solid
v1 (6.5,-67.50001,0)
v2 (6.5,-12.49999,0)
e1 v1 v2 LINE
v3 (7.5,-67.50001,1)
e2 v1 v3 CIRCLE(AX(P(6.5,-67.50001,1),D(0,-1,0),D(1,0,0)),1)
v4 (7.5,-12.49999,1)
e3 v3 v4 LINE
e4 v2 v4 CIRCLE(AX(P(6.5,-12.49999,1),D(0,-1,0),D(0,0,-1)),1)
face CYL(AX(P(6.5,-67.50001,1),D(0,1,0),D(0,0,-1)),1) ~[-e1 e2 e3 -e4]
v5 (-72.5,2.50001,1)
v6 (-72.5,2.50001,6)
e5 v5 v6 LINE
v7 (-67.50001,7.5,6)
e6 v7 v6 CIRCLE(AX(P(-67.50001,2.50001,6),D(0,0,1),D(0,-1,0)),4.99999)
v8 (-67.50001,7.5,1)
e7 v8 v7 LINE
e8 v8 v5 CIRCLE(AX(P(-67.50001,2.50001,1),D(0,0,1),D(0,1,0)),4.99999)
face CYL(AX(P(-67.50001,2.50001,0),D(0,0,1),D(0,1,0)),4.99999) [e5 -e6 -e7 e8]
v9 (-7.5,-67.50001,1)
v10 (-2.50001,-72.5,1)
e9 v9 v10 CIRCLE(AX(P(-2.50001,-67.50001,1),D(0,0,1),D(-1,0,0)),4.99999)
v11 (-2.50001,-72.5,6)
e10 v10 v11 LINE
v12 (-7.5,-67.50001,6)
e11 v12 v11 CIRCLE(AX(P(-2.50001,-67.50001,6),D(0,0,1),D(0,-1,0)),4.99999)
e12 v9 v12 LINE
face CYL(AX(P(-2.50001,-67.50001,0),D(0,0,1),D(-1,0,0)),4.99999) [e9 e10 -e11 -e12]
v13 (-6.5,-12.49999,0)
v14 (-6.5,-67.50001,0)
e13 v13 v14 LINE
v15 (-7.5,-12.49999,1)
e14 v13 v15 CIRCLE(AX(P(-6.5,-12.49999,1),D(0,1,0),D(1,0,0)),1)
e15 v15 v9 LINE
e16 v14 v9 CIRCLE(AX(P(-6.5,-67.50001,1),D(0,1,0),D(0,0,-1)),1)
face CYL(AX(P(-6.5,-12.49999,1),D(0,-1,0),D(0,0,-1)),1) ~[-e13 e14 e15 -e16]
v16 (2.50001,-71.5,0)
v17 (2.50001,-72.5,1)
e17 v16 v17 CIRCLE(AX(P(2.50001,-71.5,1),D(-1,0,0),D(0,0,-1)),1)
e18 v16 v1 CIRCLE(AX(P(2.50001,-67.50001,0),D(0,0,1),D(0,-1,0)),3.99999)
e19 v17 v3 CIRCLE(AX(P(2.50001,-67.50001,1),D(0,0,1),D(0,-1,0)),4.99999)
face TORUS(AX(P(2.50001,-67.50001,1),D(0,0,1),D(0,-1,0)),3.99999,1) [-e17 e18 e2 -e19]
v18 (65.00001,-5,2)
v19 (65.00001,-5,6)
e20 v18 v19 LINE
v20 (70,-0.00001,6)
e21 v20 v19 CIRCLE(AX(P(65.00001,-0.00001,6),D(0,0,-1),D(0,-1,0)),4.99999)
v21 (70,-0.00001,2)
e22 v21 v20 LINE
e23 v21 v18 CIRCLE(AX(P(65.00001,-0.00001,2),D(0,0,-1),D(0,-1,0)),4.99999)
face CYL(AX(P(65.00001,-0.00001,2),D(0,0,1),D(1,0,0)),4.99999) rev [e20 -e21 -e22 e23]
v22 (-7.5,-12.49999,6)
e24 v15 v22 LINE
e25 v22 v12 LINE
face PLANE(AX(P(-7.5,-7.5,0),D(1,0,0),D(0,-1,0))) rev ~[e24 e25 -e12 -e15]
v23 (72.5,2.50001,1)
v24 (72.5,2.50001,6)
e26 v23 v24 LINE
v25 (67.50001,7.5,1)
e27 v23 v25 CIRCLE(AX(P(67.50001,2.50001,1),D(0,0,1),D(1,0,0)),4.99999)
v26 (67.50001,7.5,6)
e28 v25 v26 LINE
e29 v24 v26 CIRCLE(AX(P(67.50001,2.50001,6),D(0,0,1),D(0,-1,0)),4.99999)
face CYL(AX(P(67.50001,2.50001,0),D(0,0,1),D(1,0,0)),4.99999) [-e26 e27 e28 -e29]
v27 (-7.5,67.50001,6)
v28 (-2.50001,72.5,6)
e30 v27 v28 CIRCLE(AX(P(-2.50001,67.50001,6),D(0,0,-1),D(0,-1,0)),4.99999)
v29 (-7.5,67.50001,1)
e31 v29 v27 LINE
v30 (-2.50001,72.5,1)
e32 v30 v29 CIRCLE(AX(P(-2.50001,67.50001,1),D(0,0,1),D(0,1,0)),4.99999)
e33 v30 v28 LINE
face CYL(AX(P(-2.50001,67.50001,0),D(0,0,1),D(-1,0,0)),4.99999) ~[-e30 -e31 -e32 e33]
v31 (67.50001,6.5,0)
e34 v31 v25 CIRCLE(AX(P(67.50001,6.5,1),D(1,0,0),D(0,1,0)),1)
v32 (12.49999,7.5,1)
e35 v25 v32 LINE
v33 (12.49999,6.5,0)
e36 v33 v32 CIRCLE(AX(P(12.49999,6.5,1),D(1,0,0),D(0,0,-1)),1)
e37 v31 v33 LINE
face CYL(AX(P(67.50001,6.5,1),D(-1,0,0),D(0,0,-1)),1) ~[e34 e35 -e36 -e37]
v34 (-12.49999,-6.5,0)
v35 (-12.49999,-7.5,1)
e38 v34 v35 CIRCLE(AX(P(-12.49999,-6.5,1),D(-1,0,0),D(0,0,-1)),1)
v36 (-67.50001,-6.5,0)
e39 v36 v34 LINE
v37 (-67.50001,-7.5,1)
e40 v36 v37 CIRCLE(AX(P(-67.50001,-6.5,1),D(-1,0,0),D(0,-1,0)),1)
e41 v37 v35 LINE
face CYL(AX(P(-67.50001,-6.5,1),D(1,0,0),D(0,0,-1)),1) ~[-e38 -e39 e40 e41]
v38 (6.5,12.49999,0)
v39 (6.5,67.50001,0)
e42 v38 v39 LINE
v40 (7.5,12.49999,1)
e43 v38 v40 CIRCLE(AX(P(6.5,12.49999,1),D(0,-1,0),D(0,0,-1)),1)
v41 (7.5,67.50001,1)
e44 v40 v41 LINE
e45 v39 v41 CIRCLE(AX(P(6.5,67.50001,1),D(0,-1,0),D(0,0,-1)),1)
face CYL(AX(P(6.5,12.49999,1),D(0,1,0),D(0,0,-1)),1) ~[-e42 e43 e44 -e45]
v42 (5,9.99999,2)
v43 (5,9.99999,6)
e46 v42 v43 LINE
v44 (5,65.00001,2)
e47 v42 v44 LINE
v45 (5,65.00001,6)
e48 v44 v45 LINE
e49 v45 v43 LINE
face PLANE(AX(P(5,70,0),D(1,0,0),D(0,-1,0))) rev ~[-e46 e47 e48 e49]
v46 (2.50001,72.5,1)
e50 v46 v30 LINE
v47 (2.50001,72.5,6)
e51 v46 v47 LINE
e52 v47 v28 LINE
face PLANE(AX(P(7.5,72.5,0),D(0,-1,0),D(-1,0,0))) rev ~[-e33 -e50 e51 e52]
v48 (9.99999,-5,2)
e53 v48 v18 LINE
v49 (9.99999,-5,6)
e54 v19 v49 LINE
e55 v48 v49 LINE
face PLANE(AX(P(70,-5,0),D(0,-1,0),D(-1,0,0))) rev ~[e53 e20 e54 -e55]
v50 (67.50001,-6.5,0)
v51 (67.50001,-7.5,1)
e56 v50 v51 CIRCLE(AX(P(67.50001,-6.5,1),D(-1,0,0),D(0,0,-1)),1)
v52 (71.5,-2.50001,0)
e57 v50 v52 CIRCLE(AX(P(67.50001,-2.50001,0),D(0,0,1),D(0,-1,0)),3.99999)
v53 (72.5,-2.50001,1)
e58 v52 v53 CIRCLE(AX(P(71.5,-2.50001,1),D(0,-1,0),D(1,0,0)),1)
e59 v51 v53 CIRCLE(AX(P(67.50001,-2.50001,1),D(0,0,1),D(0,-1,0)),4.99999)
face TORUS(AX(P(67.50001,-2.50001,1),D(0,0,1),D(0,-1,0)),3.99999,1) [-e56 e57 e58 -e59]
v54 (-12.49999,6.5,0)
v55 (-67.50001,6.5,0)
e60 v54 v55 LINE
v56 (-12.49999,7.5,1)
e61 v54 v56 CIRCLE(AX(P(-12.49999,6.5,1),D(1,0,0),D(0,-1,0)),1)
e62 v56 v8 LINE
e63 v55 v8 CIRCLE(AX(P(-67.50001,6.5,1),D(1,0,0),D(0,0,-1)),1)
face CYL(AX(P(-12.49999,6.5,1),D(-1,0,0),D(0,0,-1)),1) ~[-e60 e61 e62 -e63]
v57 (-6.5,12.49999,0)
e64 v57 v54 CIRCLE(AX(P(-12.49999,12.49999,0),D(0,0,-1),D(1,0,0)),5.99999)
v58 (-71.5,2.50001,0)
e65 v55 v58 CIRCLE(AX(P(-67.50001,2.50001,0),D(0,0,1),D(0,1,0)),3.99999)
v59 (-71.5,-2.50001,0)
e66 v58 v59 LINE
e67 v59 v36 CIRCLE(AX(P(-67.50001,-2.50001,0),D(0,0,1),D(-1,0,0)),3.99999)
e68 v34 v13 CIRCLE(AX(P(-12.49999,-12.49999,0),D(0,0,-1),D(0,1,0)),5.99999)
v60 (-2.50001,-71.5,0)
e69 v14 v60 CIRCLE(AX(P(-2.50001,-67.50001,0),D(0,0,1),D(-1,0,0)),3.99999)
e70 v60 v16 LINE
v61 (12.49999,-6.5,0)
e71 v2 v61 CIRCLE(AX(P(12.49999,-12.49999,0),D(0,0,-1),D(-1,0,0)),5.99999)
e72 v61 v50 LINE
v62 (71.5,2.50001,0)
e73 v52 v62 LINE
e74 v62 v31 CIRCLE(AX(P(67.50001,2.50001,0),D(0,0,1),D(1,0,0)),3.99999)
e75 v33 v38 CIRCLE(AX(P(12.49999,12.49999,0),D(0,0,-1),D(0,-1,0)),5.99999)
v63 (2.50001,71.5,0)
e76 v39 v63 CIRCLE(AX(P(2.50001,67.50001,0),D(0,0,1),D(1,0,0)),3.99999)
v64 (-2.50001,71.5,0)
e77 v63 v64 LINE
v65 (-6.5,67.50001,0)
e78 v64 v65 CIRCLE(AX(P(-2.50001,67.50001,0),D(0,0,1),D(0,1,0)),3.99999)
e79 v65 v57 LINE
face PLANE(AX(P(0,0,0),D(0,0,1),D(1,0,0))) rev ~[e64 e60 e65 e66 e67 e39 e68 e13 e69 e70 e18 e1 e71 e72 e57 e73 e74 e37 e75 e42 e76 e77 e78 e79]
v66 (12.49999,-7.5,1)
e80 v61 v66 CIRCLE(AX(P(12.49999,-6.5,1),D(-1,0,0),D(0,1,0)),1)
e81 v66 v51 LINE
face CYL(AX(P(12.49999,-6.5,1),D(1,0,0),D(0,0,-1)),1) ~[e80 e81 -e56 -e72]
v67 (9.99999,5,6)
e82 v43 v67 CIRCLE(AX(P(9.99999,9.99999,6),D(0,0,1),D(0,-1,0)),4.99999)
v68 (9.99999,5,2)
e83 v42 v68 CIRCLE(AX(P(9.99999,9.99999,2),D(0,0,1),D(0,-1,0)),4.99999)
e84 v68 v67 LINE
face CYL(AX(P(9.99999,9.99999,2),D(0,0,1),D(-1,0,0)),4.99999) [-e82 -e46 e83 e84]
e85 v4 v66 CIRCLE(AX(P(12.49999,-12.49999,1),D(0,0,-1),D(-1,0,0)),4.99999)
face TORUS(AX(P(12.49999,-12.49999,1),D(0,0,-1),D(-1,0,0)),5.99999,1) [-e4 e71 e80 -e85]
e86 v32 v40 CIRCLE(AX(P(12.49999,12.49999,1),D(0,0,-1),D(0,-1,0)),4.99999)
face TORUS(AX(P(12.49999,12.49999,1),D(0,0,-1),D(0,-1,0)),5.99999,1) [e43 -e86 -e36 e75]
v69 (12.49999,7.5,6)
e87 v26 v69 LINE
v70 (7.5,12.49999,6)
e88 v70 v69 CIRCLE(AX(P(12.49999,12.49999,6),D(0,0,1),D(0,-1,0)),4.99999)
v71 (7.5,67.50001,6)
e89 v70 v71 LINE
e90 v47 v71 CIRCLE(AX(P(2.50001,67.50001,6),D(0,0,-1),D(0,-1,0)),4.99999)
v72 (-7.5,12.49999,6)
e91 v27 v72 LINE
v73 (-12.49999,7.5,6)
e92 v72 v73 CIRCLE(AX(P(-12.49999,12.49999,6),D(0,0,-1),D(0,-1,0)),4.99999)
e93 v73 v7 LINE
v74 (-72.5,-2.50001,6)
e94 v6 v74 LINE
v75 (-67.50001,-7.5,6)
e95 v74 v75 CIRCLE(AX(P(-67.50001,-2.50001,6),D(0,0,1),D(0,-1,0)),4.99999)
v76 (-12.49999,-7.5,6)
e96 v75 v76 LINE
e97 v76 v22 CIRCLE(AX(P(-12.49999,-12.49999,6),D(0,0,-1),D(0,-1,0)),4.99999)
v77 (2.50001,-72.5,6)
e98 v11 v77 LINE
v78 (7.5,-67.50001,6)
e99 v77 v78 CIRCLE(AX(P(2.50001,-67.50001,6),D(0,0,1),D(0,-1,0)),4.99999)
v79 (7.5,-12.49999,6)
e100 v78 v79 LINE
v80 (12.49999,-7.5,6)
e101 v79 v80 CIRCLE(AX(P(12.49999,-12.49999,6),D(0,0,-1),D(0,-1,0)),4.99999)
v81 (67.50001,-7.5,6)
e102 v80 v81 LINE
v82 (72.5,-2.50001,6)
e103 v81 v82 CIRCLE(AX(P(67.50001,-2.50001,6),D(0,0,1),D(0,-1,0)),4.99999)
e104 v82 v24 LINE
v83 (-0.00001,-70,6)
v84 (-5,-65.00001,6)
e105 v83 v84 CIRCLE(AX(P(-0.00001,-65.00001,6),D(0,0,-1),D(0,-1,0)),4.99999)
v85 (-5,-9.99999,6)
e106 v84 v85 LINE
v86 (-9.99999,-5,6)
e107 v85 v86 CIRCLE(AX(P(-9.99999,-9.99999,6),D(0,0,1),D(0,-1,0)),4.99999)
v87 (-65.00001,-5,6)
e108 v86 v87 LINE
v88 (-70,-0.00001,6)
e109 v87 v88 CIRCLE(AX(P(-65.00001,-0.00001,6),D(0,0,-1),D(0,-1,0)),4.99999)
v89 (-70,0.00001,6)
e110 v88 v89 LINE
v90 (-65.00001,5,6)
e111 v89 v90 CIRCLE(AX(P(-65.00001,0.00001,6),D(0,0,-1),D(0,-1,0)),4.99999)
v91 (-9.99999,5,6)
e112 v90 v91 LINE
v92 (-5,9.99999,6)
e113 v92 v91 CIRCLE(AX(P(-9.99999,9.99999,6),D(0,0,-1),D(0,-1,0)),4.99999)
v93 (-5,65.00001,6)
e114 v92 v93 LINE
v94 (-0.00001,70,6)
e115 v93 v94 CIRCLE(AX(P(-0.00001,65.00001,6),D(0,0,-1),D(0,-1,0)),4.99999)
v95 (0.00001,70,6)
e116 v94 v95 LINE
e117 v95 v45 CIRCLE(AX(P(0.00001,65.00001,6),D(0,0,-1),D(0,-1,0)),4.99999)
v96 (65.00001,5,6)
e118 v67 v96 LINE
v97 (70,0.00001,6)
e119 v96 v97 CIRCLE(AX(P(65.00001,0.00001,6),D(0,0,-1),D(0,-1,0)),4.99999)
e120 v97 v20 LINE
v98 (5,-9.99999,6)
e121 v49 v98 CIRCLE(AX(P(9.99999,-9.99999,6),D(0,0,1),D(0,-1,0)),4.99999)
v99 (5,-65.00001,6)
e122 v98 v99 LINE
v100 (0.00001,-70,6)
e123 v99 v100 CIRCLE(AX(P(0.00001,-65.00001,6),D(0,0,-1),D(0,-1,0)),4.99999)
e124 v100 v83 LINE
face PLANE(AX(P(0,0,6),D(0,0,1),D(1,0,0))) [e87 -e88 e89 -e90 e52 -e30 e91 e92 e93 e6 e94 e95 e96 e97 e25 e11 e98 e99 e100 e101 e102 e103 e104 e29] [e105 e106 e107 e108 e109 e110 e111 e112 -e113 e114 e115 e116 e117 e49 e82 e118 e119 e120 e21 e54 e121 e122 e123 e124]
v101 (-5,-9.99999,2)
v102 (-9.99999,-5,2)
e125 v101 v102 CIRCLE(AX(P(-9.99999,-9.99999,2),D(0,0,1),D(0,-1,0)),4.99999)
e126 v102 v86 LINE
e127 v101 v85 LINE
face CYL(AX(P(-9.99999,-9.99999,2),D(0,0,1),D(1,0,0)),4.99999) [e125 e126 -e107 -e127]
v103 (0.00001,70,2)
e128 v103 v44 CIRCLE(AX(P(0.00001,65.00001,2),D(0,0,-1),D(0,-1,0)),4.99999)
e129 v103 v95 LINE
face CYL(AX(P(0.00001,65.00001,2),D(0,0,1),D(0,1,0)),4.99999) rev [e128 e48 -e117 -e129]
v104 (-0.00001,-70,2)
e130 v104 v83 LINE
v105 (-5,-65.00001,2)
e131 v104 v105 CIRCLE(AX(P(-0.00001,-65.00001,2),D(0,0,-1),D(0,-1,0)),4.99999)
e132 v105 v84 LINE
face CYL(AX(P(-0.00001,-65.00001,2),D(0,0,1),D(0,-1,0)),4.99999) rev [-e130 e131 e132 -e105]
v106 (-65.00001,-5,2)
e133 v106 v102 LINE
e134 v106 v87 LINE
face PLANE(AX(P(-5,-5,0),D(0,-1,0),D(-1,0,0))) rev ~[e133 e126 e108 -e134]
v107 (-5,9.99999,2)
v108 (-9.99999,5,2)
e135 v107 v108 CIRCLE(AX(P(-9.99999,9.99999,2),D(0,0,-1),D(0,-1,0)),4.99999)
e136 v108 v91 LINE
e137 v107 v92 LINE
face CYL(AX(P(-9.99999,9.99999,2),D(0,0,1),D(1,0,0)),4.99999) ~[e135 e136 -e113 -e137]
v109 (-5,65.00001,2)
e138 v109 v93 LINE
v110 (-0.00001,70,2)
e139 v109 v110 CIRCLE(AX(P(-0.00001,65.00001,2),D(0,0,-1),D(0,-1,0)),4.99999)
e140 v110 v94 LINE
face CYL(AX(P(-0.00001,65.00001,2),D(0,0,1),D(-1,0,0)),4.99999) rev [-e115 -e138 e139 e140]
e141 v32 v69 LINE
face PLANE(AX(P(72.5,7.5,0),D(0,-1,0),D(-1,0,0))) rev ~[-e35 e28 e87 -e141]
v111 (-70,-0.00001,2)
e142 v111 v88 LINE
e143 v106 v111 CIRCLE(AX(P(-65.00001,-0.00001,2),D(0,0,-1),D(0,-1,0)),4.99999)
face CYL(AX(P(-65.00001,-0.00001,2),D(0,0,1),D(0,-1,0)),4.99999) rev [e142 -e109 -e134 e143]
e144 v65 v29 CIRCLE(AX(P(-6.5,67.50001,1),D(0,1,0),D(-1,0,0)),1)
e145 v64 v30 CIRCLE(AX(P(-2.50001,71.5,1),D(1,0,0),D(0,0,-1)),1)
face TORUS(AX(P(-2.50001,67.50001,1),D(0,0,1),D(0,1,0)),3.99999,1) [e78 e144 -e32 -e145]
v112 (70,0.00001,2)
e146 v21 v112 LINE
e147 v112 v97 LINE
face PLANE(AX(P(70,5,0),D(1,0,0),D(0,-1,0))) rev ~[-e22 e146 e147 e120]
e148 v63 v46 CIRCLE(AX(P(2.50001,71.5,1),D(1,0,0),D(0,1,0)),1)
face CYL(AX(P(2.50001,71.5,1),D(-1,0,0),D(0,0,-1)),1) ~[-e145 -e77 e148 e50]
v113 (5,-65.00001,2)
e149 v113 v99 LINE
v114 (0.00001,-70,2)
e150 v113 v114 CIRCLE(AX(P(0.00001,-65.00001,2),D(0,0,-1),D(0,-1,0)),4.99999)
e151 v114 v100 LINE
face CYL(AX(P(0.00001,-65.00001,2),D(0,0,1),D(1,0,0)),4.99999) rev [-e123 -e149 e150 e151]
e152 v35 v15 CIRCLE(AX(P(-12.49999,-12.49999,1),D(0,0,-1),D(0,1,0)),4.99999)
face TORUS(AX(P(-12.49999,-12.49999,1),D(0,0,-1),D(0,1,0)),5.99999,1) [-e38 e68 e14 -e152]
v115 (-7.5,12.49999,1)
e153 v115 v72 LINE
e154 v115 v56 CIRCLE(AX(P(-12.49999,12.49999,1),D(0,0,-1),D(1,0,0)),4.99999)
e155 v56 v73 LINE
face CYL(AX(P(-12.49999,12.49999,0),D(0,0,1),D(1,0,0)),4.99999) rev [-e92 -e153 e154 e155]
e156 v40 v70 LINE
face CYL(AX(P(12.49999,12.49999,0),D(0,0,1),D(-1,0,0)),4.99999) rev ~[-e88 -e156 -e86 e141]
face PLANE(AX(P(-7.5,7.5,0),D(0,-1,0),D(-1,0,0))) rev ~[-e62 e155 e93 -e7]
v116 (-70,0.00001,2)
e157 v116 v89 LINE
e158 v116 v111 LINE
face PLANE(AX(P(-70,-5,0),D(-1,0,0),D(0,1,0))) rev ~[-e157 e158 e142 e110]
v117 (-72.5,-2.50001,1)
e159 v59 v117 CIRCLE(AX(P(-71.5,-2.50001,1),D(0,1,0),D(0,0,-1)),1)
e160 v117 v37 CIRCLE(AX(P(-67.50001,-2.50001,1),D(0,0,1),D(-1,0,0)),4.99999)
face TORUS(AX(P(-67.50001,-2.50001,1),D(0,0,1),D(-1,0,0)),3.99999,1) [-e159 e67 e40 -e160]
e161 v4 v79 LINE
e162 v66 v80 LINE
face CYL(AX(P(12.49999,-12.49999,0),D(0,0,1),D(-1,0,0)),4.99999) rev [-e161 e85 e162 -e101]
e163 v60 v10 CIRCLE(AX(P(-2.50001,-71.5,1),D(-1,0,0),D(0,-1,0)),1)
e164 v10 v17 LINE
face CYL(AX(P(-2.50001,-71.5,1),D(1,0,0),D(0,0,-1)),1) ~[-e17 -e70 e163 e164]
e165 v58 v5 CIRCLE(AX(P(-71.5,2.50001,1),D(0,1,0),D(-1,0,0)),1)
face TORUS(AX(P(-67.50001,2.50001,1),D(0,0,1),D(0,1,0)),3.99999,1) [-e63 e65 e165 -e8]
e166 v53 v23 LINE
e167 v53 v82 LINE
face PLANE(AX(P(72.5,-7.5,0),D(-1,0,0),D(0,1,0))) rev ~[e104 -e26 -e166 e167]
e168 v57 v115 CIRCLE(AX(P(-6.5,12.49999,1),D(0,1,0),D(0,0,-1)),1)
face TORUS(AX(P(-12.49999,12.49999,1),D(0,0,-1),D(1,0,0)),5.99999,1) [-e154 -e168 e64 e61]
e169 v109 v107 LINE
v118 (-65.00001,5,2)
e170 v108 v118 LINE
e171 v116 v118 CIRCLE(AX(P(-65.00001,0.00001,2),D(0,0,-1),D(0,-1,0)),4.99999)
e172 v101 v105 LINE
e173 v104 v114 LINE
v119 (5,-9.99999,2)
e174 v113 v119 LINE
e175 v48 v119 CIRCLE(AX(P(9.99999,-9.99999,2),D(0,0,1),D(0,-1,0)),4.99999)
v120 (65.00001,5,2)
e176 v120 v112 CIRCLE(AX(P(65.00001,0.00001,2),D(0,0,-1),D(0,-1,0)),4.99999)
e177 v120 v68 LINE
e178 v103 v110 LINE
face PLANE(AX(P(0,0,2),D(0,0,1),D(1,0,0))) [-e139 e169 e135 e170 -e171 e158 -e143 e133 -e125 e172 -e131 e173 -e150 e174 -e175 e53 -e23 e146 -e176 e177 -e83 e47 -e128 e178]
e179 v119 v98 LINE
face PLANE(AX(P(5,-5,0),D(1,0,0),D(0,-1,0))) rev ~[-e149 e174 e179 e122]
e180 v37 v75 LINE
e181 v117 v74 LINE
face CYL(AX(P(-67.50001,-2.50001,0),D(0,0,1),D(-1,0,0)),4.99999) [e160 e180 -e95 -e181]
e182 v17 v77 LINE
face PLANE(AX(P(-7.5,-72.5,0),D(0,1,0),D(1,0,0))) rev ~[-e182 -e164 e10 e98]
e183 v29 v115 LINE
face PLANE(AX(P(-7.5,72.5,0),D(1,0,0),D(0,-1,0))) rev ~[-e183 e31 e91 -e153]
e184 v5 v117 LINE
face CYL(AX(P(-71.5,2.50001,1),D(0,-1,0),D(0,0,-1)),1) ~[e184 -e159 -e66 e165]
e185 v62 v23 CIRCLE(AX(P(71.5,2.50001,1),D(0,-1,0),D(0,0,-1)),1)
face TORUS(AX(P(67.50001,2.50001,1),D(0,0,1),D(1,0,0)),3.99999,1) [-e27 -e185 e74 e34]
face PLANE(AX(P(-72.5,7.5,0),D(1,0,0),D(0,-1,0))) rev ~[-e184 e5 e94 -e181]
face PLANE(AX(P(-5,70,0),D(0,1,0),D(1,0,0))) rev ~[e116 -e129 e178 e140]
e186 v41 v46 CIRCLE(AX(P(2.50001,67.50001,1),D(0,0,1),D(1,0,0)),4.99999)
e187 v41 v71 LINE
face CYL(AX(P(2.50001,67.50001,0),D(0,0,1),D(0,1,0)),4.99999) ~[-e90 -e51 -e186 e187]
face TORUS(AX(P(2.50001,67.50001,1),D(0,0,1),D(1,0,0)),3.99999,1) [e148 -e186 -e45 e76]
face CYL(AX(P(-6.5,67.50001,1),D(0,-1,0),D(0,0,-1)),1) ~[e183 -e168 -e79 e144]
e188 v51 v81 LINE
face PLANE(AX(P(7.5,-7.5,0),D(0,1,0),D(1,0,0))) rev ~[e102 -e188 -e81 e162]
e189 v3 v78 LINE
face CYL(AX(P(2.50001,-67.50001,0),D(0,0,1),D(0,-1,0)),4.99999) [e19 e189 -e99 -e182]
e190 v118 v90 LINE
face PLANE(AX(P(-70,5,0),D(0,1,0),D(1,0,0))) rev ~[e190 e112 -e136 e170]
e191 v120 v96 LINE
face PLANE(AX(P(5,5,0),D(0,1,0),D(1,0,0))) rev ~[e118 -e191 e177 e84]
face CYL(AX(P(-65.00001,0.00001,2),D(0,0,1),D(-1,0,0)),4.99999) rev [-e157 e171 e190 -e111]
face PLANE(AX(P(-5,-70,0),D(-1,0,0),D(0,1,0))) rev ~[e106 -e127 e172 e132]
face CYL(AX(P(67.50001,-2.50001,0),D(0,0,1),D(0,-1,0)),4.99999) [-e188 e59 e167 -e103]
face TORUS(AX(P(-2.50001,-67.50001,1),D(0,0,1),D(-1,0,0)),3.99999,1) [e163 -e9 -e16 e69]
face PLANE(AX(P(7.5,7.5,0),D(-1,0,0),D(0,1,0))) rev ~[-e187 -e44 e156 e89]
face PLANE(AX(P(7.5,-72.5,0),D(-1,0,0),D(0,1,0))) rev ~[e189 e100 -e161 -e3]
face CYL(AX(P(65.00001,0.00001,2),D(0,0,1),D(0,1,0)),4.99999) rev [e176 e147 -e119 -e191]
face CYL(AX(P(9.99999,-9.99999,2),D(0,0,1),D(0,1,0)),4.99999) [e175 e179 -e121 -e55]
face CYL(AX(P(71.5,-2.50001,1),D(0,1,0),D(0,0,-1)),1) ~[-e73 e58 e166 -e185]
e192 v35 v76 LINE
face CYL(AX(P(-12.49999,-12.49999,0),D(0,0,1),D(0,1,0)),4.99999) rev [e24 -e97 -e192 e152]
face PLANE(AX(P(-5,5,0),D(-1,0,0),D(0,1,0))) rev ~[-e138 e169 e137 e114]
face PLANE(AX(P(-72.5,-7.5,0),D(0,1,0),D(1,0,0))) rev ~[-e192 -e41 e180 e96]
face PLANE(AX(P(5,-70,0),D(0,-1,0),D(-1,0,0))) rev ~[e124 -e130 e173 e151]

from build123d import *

# Parameters (mm, degrees)
F1_DEPTH = 2
F2_DEPTH = 6
F3_R     = 4.99999
F4_R     = 1


# Not quite as in the source:
# - a fillet or chamfer is up to 0.001 mm smaller than in the source, because OpenCascade refuses the exact size


with BuildPart() as f1:
    # F0 (on Top) → F1 (new body)
    with BuildSketch(Plane.XY):
        Polygon((5, 70), (0, 70), (-5, 70), (-5, 5), (-70, 5), (-70, -5), (-5, -5), (-5, -70), (0, -70), (5, -70), (5, -5), (70, -5), (70, 5), (5, 5), align=None)
    extrude(amount=F1_DEPTH)

    # F0 (on Top) → F2 (join)
    with BuildSketch(Plane.XY):
        Polygon((0, 72.5), (-7.5, 72.5), (-7.5, 7.5), (-72.5, 7.5), (-72.5, 6.8834697455), (-72.5, -7.5), (-7.5, -7.5), (-7.5, -72.5), (0, -72.5), (7.5, -72.5), (7.5, -7.5), (72.5, -7.5), (72.5, 7.5), (7.5, 7.5), (7.5, 72.5), align=None)
        Polygon((-5, 70), (0, 70), (5, 70), (5, 5), (70, 5), (70, -5), (5, -5), (5, -70), (0, -70), (-5, -70), (-5, -5), (-70, -5), (-70, 5), (-5, 5), align=None, mode=Mode.SUBTRACT)
    extrude(amount=F2_DEPTH)

    # F3 (radius 5 in the source; OpenCascade refuses exactly that, so slightly less here)
    f3_edges = [f1.edges().sort_by_distance(p)[0] for p in [
        (-5, 70, 4),
        (-70, 5, 4),
        (5, 70, 4),
        (70, 5, 4),
        (70, -5, 4),
        (5, -70, 4),
        (-70, -5, 4),
        (-5, -70, 4),
        (-7.5, 72.5, 3),
        (7.5, 72.5, 3),
        (72.5, 7.5, 3),
        (72.5, -7.5, 3),
        (7.5, -72.5, 3),
        (-72.5, 7.5, 3),
        (-72.5, -7.5, 3),
        (-7.5, -72.5, 3),
        (-7.5, -7.5, 3),
        (-5, 5, 4),
        (5, 5, 4),
        (5, -5, 4),
        (-7.5, 7.5, 3),
        (-5, -5, 4),
        (7.5, 7.5, 3),
        (7.5, -7.5, 3),
    ]]
    fillet(f3_edges, radius=F3_R)

    # F4
    f4_edges = [f1.edges().sort_by_distance(p)[0] for p in [
        (7.5, 40, 0),
    ]]
    fillet(f4_edges, radius=F4_R)


solid = f1.part
